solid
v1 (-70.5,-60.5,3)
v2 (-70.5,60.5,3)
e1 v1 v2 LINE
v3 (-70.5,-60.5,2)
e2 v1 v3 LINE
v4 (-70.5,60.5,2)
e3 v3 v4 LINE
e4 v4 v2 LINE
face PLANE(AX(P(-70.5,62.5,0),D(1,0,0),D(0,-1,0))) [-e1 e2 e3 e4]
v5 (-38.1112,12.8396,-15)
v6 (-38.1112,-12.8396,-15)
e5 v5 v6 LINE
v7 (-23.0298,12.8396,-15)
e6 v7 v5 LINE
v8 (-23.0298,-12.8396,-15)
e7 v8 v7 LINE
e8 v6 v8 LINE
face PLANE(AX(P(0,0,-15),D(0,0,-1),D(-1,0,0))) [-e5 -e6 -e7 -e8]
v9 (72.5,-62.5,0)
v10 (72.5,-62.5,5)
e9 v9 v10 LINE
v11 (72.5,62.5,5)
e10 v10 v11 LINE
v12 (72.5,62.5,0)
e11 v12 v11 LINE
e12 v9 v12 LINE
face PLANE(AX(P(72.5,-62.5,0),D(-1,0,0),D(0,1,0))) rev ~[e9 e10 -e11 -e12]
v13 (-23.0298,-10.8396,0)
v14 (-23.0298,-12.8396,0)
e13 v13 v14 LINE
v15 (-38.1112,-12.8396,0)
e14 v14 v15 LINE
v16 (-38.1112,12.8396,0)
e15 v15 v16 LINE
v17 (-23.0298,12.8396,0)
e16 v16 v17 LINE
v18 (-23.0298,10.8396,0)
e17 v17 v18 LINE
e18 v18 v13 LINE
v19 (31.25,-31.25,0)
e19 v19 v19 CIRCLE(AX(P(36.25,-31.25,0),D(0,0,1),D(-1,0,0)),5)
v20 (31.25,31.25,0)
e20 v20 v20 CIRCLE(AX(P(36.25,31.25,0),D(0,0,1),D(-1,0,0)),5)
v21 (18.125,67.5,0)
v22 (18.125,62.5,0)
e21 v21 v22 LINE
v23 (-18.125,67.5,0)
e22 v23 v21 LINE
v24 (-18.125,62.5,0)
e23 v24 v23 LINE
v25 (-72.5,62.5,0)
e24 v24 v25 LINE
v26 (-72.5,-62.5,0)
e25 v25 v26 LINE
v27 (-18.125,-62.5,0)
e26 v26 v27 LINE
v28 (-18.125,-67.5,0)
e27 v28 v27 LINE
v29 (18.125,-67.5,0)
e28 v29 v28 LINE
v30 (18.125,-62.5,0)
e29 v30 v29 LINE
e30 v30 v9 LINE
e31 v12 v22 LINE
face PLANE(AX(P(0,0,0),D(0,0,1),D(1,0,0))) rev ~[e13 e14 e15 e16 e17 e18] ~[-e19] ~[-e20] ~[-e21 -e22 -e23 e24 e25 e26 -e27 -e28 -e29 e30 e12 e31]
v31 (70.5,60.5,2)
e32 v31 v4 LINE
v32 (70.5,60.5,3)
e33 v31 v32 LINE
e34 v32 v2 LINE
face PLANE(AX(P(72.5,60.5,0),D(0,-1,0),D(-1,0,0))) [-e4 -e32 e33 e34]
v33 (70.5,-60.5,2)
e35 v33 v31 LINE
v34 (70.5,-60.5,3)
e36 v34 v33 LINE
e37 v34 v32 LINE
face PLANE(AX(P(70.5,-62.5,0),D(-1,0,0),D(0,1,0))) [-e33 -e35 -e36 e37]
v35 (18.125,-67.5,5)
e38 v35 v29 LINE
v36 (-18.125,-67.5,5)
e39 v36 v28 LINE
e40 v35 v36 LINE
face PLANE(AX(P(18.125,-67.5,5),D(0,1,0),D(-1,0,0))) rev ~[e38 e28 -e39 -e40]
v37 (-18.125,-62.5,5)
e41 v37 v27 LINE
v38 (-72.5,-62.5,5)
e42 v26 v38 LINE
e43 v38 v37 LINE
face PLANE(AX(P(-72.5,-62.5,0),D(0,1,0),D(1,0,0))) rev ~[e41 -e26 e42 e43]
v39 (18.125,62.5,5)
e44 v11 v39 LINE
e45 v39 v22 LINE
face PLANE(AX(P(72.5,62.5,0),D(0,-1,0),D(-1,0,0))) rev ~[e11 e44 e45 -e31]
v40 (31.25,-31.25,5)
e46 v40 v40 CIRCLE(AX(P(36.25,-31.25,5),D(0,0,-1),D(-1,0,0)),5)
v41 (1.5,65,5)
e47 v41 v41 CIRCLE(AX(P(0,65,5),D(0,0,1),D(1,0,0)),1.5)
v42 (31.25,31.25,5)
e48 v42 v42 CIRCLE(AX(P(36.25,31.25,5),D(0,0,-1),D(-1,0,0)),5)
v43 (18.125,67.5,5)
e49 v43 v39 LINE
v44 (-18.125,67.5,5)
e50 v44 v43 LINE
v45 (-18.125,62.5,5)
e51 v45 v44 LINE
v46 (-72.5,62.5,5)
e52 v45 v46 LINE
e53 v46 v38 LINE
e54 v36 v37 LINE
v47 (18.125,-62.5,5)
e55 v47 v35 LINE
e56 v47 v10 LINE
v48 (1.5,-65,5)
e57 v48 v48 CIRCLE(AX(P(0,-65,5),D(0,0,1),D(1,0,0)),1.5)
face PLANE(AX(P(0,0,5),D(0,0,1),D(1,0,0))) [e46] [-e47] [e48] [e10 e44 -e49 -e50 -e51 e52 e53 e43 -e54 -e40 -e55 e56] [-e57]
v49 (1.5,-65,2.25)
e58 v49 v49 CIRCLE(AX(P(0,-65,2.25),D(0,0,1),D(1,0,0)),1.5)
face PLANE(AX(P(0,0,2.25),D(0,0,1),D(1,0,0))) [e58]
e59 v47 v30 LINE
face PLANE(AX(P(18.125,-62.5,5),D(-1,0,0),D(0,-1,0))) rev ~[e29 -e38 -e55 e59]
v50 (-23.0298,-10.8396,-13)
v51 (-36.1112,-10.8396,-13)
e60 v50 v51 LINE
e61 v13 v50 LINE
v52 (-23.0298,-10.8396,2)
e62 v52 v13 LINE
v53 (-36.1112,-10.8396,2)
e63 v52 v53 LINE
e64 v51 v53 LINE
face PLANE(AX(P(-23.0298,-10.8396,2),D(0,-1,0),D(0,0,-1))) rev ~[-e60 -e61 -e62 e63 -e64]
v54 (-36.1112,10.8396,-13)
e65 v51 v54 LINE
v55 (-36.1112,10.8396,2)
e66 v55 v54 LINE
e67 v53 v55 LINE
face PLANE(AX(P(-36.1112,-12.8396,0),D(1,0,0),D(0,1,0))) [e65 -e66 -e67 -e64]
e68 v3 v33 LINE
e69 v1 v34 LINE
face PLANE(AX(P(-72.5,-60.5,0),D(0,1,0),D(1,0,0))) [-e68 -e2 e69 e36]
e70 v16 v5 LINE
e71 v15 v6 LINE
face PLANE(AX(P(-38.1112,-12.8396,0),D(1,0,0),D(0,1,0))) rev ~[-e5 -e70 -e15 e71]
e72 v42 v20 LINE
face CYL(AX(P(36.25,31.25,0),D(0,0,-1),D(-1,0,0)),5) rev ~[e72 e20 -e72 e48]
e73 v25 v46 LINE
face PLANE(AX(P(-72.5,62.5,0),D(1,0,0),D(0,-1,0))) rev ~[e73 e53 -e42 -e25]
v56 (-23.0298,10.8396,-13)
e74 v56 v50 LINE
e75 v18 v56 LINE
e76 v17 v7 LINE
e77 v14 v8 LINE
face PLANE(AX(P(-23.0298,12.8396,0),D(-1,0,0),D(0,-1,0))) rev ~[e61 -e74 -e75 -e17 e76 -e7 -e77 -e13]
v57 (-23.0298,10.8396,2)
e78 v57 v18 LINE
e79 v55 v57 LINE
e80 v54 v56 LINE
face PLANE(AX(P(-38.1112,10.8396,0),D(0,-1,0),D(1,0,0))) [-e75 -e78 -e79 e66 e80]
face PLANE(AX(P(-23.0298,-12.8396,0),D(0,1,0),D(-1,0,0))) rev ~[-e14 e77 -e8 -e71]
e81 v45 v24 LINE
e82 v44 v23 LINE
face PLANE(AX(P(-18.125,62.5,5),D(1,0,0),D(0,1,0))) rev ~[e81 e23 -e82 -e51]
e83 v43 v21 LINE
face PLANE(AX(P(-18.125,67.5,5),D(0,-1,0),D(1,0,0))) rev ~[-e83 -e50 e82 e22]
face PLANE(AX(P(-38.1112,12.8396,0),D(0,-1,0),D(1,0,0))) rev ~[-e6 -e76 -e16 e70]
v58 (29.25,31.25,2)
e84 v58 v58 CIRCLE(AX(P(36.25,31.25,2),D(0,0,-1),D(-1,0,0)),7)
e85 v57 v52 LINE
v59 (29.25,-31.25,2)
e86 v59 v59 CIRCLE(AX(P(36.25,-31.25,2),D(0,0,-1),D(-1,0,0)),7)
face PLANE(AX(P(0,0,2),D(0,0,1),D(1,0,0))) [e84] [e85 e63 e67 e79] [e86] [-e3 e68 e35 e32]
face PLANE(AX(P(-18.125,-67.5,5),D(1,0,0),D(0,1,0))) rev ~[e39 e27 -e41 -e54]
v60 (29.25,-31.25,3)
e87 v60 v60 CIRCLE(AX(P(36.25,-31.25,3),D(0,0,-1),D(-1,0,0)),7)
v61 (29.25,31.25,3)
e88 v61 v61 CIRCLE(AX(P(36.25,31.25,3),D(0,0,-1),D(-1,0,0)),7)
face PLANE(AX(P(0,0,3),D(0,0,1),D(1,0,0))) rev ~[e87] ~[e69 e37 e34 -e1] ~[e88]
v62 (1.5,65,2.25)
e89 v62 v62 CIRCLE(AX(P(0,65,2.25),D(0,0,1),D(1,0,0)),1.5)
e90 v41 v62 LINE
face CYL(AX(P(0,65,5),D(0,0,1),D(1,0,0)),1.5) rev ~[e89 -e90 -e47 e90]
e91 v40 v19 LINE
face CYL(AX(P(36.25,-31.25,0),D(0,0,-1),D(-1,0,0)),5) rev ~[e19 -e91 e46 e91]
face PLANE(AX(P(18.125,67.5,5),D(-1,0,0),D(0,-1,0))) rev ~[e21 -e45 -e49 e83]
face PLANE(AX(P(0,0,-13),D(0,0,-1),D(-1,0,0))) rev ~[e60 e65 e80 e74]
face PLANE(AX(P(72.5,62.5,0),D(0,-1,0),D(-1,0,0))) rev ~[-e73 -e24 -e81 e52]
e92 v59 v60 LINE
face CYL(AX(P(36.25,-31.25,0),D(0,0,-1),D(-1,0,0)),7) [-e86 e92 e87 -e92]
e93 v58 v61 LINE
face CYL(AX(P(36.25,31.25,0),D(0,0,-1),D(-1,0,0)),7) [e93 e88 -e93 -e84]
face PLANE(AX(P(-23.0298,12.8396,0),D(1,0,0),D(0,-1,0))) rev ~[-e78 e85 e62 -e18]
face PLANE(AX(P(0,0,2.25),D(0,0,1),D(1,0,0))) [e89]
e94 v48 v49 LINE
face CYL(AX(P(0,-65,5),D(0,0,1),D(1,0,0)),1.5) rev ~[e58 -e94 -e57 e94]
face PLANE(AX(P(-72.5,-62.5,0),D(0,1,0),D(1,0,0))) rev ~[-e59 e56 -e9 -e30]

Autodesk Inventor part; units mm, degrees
ref_plane "YZ Plane" through (0, 0, 0) normal (1, 0, 0) x (0, 1, 0)
ref_plane "XZ Plane" through (0, 0, 0) normal (0, 1, 0) x (-1, 0, 0)
ref_plane "XY Plane" through (0, 0, 0) normal (0, 0, 1) x (1, 0, 0)
sketch "Sketch1" plane through (0, 0, 0) normal (0, 0, 1) x (1, 0, 0)
  line L0 (72.5, 62.5) -> (-72.5, 62.5)
  line L1 (-72.5, 62.5) -> (-72.5, -62.5)
  line L2 (-72.5, -62.5) -> (72.5, -62.5)
  line L3 (72.5, -62.5) -> (72.5, 62.5)
  line L4 (72.5, 62.5) -> (-72.5, -62.5) construction
  line L5 (-72.5, 62.5) -> (72.5, -62.5) construction
  point P0 (0, 0)
  dimension "d0" = 145
  dimension "d1" = 125
extrude "Extrusion1" add sketch "Sketch1" along normal blind 5
sketch "Sketch2" plane through (0, 0, 0) normal (0, 0, -1) x (-1, 0, 0)
  line L0 (-72.5, -62.5) -> (-72.5, 62.5) projected
  line L1 (-72.5, 62.5) -> (0, 0)
  line L2 (0, 0) -> (-72.5, -62.5)
  circle A0 centre (-36.25, 31.25) radius 5
  circle A1 centre (-36.25, -31.25) radius 5
  dimension "d4" = 10
  dimension "d5" = 10
extrude "Extrusion2" cut sketch "Sketch2" against normal blind 18.5 contours A1 L2 | L2 A1 | A0 L1 | L1 A0
sketch "Sketch3" plane through (0, 0, 0) normal (0, 0, -1) x (-1, 0, 0)
  line L0 (23.0298, -12.8396) -> (38.1112, -12.8396)
  line L1 (38.1112, -12.8396) -> (38.1112, 12.8396)
  line L2 (38.1112, 12.8396) -> (23.0298, 12.8396)
  line L3 (23.0298, 12.8396) -> (23.0298, -12.8396)
  line L4 (23.0298, -12.8396) -> (38.1112, 12.8396) construction
  line L5 (38.1112, -12.8396) -> (23.0298, 12.8396) construction
  point P0 (0, 0)
  point P1 (30.5705, 0)
extrude "Extrusion3" add sketch "Sketch3" along normal blind 15
shell "Shell1" thickness 2 removed faces 1 at (-23.0298, 4.2799, -5)
sketch "Sketch4" plane through (0, 0, 5) normal (0, 0, 1) x (1, 0, 0)
  line L0 (-72.5, -62.5) -> (72.5, -62.5) projected
  line L1 (0, 0) -> (-72.5, -62.5)
  line L2 (-36.25, -31.25) -> (0, -62.5)
  line L3 (-36.25, -31.25) -> (-36.25, -62.5)
  line L4 (-18.125, -46.875) -> (-18.125, -62.5)
  line L5 (0, 0) -> (72.5, -62.5)
  circle A0 centre (36.25, -31.25) radius 5 projected
  line L6 (36.25, -31.25) -> (0, -62.5)
  line L7 (18.125, -46.875) -> (18.125, -62.5)
  line L8 (-18.125, -62.5) -> (18.125, -62.5)
  line L9 (18.125, -62.5) -> (18.125, -67.5)
  line L10 (18.125, -67.5) -> (-18.125, -67.5)
  line L11 (-18.125, -67.5) -> (-18.125, -62.5)
  dimension "d11" = 5
extrude "Extrusion4" add sketch "Sketch4" against normal blind 5 contours L0 L9 L10 L11
sketch "Sketch5" plane through (0, 0, 5) normal (0, 0, 1) x (1, 0, 0)
  line L0 (72.5, -62.5) -> (72.5, 62.5) projected
  line L1 (0, 0) -> (72.5, 62.5)
  line L2 (-72.5, 62.5) -> (-72.5, -62.5) projected
  line L3 (0, 0) -> (-72.5, 62.5)
  circle A0 centre (36.25, 31.25) radius 5 projected
  line L4 (36.25, 31.25) -> (36.25, 62.5)
  line L5 (72.5, 62.5) -> (-72.5, 62.5) projected
  line L6 (-36.25, 31.25) -> (-36.25, 62.5)
  line L7 (-18.125, 15.625) -> (-18.125, 62.5)
  line L8 (36.25, 31.25) -> (0, 31.25)
  line L9 (18.125, 31.25) -> (18.125, 62.5)
  line L10 (18.125, 62.5) -> (-18.125, 62.5)
  line L11 (-18.125, 62.5) -> (-18.125, 67.5)
  line L12 (-18.125, 67.5) -> (18.125, 67.5)
  line L13 (18.125, 67.5) -> (18.125, 62.5)
  dimension "d14" = 5
extrude "Extrusion5" add sketch "Sketch5" against normal blind 5 contours L11 L12 L13 L5
sketch "Sketch6" plane through (0, 0, 5) normal (0, 0, 1) x (1, 0, 0)
  line L0 (-18.125, -62.5) -> (-18.125, -67.5) projected
  line L1 (18.125, -67.5) -> (18.125, -62.5) projected
  line L2 (-18.125, -62.5) -> (18.125, -62.5)
  circle A0 centre (0, -65) radius 1.5
  point P0 (0, 0)
  dimension "d17" = 3
extrude "Extrusion6" cut sketch "Sketch6" against normal blind 2.75
sketch "Sketch7" plane through (0, 0, 5) normal (0, 0, 1) x (1, 0, 0)
  line L0 (-18.125, 62.5) -> (-72.5, 62.5) projected
  line L1 (18.125, 62.5) -> (18.125, 67.5) projected
  line L2 (-18.125, 62.5) -> (18.125, 62.5)
  circle A0 centre (0, 65) radius 1.5
  point P0 (0, 0)
  dimension "d20" = 3
extrude "Extrusion7" cut sketch "Sketch7" against normal blind 2.75
properties part number "broomba base"
